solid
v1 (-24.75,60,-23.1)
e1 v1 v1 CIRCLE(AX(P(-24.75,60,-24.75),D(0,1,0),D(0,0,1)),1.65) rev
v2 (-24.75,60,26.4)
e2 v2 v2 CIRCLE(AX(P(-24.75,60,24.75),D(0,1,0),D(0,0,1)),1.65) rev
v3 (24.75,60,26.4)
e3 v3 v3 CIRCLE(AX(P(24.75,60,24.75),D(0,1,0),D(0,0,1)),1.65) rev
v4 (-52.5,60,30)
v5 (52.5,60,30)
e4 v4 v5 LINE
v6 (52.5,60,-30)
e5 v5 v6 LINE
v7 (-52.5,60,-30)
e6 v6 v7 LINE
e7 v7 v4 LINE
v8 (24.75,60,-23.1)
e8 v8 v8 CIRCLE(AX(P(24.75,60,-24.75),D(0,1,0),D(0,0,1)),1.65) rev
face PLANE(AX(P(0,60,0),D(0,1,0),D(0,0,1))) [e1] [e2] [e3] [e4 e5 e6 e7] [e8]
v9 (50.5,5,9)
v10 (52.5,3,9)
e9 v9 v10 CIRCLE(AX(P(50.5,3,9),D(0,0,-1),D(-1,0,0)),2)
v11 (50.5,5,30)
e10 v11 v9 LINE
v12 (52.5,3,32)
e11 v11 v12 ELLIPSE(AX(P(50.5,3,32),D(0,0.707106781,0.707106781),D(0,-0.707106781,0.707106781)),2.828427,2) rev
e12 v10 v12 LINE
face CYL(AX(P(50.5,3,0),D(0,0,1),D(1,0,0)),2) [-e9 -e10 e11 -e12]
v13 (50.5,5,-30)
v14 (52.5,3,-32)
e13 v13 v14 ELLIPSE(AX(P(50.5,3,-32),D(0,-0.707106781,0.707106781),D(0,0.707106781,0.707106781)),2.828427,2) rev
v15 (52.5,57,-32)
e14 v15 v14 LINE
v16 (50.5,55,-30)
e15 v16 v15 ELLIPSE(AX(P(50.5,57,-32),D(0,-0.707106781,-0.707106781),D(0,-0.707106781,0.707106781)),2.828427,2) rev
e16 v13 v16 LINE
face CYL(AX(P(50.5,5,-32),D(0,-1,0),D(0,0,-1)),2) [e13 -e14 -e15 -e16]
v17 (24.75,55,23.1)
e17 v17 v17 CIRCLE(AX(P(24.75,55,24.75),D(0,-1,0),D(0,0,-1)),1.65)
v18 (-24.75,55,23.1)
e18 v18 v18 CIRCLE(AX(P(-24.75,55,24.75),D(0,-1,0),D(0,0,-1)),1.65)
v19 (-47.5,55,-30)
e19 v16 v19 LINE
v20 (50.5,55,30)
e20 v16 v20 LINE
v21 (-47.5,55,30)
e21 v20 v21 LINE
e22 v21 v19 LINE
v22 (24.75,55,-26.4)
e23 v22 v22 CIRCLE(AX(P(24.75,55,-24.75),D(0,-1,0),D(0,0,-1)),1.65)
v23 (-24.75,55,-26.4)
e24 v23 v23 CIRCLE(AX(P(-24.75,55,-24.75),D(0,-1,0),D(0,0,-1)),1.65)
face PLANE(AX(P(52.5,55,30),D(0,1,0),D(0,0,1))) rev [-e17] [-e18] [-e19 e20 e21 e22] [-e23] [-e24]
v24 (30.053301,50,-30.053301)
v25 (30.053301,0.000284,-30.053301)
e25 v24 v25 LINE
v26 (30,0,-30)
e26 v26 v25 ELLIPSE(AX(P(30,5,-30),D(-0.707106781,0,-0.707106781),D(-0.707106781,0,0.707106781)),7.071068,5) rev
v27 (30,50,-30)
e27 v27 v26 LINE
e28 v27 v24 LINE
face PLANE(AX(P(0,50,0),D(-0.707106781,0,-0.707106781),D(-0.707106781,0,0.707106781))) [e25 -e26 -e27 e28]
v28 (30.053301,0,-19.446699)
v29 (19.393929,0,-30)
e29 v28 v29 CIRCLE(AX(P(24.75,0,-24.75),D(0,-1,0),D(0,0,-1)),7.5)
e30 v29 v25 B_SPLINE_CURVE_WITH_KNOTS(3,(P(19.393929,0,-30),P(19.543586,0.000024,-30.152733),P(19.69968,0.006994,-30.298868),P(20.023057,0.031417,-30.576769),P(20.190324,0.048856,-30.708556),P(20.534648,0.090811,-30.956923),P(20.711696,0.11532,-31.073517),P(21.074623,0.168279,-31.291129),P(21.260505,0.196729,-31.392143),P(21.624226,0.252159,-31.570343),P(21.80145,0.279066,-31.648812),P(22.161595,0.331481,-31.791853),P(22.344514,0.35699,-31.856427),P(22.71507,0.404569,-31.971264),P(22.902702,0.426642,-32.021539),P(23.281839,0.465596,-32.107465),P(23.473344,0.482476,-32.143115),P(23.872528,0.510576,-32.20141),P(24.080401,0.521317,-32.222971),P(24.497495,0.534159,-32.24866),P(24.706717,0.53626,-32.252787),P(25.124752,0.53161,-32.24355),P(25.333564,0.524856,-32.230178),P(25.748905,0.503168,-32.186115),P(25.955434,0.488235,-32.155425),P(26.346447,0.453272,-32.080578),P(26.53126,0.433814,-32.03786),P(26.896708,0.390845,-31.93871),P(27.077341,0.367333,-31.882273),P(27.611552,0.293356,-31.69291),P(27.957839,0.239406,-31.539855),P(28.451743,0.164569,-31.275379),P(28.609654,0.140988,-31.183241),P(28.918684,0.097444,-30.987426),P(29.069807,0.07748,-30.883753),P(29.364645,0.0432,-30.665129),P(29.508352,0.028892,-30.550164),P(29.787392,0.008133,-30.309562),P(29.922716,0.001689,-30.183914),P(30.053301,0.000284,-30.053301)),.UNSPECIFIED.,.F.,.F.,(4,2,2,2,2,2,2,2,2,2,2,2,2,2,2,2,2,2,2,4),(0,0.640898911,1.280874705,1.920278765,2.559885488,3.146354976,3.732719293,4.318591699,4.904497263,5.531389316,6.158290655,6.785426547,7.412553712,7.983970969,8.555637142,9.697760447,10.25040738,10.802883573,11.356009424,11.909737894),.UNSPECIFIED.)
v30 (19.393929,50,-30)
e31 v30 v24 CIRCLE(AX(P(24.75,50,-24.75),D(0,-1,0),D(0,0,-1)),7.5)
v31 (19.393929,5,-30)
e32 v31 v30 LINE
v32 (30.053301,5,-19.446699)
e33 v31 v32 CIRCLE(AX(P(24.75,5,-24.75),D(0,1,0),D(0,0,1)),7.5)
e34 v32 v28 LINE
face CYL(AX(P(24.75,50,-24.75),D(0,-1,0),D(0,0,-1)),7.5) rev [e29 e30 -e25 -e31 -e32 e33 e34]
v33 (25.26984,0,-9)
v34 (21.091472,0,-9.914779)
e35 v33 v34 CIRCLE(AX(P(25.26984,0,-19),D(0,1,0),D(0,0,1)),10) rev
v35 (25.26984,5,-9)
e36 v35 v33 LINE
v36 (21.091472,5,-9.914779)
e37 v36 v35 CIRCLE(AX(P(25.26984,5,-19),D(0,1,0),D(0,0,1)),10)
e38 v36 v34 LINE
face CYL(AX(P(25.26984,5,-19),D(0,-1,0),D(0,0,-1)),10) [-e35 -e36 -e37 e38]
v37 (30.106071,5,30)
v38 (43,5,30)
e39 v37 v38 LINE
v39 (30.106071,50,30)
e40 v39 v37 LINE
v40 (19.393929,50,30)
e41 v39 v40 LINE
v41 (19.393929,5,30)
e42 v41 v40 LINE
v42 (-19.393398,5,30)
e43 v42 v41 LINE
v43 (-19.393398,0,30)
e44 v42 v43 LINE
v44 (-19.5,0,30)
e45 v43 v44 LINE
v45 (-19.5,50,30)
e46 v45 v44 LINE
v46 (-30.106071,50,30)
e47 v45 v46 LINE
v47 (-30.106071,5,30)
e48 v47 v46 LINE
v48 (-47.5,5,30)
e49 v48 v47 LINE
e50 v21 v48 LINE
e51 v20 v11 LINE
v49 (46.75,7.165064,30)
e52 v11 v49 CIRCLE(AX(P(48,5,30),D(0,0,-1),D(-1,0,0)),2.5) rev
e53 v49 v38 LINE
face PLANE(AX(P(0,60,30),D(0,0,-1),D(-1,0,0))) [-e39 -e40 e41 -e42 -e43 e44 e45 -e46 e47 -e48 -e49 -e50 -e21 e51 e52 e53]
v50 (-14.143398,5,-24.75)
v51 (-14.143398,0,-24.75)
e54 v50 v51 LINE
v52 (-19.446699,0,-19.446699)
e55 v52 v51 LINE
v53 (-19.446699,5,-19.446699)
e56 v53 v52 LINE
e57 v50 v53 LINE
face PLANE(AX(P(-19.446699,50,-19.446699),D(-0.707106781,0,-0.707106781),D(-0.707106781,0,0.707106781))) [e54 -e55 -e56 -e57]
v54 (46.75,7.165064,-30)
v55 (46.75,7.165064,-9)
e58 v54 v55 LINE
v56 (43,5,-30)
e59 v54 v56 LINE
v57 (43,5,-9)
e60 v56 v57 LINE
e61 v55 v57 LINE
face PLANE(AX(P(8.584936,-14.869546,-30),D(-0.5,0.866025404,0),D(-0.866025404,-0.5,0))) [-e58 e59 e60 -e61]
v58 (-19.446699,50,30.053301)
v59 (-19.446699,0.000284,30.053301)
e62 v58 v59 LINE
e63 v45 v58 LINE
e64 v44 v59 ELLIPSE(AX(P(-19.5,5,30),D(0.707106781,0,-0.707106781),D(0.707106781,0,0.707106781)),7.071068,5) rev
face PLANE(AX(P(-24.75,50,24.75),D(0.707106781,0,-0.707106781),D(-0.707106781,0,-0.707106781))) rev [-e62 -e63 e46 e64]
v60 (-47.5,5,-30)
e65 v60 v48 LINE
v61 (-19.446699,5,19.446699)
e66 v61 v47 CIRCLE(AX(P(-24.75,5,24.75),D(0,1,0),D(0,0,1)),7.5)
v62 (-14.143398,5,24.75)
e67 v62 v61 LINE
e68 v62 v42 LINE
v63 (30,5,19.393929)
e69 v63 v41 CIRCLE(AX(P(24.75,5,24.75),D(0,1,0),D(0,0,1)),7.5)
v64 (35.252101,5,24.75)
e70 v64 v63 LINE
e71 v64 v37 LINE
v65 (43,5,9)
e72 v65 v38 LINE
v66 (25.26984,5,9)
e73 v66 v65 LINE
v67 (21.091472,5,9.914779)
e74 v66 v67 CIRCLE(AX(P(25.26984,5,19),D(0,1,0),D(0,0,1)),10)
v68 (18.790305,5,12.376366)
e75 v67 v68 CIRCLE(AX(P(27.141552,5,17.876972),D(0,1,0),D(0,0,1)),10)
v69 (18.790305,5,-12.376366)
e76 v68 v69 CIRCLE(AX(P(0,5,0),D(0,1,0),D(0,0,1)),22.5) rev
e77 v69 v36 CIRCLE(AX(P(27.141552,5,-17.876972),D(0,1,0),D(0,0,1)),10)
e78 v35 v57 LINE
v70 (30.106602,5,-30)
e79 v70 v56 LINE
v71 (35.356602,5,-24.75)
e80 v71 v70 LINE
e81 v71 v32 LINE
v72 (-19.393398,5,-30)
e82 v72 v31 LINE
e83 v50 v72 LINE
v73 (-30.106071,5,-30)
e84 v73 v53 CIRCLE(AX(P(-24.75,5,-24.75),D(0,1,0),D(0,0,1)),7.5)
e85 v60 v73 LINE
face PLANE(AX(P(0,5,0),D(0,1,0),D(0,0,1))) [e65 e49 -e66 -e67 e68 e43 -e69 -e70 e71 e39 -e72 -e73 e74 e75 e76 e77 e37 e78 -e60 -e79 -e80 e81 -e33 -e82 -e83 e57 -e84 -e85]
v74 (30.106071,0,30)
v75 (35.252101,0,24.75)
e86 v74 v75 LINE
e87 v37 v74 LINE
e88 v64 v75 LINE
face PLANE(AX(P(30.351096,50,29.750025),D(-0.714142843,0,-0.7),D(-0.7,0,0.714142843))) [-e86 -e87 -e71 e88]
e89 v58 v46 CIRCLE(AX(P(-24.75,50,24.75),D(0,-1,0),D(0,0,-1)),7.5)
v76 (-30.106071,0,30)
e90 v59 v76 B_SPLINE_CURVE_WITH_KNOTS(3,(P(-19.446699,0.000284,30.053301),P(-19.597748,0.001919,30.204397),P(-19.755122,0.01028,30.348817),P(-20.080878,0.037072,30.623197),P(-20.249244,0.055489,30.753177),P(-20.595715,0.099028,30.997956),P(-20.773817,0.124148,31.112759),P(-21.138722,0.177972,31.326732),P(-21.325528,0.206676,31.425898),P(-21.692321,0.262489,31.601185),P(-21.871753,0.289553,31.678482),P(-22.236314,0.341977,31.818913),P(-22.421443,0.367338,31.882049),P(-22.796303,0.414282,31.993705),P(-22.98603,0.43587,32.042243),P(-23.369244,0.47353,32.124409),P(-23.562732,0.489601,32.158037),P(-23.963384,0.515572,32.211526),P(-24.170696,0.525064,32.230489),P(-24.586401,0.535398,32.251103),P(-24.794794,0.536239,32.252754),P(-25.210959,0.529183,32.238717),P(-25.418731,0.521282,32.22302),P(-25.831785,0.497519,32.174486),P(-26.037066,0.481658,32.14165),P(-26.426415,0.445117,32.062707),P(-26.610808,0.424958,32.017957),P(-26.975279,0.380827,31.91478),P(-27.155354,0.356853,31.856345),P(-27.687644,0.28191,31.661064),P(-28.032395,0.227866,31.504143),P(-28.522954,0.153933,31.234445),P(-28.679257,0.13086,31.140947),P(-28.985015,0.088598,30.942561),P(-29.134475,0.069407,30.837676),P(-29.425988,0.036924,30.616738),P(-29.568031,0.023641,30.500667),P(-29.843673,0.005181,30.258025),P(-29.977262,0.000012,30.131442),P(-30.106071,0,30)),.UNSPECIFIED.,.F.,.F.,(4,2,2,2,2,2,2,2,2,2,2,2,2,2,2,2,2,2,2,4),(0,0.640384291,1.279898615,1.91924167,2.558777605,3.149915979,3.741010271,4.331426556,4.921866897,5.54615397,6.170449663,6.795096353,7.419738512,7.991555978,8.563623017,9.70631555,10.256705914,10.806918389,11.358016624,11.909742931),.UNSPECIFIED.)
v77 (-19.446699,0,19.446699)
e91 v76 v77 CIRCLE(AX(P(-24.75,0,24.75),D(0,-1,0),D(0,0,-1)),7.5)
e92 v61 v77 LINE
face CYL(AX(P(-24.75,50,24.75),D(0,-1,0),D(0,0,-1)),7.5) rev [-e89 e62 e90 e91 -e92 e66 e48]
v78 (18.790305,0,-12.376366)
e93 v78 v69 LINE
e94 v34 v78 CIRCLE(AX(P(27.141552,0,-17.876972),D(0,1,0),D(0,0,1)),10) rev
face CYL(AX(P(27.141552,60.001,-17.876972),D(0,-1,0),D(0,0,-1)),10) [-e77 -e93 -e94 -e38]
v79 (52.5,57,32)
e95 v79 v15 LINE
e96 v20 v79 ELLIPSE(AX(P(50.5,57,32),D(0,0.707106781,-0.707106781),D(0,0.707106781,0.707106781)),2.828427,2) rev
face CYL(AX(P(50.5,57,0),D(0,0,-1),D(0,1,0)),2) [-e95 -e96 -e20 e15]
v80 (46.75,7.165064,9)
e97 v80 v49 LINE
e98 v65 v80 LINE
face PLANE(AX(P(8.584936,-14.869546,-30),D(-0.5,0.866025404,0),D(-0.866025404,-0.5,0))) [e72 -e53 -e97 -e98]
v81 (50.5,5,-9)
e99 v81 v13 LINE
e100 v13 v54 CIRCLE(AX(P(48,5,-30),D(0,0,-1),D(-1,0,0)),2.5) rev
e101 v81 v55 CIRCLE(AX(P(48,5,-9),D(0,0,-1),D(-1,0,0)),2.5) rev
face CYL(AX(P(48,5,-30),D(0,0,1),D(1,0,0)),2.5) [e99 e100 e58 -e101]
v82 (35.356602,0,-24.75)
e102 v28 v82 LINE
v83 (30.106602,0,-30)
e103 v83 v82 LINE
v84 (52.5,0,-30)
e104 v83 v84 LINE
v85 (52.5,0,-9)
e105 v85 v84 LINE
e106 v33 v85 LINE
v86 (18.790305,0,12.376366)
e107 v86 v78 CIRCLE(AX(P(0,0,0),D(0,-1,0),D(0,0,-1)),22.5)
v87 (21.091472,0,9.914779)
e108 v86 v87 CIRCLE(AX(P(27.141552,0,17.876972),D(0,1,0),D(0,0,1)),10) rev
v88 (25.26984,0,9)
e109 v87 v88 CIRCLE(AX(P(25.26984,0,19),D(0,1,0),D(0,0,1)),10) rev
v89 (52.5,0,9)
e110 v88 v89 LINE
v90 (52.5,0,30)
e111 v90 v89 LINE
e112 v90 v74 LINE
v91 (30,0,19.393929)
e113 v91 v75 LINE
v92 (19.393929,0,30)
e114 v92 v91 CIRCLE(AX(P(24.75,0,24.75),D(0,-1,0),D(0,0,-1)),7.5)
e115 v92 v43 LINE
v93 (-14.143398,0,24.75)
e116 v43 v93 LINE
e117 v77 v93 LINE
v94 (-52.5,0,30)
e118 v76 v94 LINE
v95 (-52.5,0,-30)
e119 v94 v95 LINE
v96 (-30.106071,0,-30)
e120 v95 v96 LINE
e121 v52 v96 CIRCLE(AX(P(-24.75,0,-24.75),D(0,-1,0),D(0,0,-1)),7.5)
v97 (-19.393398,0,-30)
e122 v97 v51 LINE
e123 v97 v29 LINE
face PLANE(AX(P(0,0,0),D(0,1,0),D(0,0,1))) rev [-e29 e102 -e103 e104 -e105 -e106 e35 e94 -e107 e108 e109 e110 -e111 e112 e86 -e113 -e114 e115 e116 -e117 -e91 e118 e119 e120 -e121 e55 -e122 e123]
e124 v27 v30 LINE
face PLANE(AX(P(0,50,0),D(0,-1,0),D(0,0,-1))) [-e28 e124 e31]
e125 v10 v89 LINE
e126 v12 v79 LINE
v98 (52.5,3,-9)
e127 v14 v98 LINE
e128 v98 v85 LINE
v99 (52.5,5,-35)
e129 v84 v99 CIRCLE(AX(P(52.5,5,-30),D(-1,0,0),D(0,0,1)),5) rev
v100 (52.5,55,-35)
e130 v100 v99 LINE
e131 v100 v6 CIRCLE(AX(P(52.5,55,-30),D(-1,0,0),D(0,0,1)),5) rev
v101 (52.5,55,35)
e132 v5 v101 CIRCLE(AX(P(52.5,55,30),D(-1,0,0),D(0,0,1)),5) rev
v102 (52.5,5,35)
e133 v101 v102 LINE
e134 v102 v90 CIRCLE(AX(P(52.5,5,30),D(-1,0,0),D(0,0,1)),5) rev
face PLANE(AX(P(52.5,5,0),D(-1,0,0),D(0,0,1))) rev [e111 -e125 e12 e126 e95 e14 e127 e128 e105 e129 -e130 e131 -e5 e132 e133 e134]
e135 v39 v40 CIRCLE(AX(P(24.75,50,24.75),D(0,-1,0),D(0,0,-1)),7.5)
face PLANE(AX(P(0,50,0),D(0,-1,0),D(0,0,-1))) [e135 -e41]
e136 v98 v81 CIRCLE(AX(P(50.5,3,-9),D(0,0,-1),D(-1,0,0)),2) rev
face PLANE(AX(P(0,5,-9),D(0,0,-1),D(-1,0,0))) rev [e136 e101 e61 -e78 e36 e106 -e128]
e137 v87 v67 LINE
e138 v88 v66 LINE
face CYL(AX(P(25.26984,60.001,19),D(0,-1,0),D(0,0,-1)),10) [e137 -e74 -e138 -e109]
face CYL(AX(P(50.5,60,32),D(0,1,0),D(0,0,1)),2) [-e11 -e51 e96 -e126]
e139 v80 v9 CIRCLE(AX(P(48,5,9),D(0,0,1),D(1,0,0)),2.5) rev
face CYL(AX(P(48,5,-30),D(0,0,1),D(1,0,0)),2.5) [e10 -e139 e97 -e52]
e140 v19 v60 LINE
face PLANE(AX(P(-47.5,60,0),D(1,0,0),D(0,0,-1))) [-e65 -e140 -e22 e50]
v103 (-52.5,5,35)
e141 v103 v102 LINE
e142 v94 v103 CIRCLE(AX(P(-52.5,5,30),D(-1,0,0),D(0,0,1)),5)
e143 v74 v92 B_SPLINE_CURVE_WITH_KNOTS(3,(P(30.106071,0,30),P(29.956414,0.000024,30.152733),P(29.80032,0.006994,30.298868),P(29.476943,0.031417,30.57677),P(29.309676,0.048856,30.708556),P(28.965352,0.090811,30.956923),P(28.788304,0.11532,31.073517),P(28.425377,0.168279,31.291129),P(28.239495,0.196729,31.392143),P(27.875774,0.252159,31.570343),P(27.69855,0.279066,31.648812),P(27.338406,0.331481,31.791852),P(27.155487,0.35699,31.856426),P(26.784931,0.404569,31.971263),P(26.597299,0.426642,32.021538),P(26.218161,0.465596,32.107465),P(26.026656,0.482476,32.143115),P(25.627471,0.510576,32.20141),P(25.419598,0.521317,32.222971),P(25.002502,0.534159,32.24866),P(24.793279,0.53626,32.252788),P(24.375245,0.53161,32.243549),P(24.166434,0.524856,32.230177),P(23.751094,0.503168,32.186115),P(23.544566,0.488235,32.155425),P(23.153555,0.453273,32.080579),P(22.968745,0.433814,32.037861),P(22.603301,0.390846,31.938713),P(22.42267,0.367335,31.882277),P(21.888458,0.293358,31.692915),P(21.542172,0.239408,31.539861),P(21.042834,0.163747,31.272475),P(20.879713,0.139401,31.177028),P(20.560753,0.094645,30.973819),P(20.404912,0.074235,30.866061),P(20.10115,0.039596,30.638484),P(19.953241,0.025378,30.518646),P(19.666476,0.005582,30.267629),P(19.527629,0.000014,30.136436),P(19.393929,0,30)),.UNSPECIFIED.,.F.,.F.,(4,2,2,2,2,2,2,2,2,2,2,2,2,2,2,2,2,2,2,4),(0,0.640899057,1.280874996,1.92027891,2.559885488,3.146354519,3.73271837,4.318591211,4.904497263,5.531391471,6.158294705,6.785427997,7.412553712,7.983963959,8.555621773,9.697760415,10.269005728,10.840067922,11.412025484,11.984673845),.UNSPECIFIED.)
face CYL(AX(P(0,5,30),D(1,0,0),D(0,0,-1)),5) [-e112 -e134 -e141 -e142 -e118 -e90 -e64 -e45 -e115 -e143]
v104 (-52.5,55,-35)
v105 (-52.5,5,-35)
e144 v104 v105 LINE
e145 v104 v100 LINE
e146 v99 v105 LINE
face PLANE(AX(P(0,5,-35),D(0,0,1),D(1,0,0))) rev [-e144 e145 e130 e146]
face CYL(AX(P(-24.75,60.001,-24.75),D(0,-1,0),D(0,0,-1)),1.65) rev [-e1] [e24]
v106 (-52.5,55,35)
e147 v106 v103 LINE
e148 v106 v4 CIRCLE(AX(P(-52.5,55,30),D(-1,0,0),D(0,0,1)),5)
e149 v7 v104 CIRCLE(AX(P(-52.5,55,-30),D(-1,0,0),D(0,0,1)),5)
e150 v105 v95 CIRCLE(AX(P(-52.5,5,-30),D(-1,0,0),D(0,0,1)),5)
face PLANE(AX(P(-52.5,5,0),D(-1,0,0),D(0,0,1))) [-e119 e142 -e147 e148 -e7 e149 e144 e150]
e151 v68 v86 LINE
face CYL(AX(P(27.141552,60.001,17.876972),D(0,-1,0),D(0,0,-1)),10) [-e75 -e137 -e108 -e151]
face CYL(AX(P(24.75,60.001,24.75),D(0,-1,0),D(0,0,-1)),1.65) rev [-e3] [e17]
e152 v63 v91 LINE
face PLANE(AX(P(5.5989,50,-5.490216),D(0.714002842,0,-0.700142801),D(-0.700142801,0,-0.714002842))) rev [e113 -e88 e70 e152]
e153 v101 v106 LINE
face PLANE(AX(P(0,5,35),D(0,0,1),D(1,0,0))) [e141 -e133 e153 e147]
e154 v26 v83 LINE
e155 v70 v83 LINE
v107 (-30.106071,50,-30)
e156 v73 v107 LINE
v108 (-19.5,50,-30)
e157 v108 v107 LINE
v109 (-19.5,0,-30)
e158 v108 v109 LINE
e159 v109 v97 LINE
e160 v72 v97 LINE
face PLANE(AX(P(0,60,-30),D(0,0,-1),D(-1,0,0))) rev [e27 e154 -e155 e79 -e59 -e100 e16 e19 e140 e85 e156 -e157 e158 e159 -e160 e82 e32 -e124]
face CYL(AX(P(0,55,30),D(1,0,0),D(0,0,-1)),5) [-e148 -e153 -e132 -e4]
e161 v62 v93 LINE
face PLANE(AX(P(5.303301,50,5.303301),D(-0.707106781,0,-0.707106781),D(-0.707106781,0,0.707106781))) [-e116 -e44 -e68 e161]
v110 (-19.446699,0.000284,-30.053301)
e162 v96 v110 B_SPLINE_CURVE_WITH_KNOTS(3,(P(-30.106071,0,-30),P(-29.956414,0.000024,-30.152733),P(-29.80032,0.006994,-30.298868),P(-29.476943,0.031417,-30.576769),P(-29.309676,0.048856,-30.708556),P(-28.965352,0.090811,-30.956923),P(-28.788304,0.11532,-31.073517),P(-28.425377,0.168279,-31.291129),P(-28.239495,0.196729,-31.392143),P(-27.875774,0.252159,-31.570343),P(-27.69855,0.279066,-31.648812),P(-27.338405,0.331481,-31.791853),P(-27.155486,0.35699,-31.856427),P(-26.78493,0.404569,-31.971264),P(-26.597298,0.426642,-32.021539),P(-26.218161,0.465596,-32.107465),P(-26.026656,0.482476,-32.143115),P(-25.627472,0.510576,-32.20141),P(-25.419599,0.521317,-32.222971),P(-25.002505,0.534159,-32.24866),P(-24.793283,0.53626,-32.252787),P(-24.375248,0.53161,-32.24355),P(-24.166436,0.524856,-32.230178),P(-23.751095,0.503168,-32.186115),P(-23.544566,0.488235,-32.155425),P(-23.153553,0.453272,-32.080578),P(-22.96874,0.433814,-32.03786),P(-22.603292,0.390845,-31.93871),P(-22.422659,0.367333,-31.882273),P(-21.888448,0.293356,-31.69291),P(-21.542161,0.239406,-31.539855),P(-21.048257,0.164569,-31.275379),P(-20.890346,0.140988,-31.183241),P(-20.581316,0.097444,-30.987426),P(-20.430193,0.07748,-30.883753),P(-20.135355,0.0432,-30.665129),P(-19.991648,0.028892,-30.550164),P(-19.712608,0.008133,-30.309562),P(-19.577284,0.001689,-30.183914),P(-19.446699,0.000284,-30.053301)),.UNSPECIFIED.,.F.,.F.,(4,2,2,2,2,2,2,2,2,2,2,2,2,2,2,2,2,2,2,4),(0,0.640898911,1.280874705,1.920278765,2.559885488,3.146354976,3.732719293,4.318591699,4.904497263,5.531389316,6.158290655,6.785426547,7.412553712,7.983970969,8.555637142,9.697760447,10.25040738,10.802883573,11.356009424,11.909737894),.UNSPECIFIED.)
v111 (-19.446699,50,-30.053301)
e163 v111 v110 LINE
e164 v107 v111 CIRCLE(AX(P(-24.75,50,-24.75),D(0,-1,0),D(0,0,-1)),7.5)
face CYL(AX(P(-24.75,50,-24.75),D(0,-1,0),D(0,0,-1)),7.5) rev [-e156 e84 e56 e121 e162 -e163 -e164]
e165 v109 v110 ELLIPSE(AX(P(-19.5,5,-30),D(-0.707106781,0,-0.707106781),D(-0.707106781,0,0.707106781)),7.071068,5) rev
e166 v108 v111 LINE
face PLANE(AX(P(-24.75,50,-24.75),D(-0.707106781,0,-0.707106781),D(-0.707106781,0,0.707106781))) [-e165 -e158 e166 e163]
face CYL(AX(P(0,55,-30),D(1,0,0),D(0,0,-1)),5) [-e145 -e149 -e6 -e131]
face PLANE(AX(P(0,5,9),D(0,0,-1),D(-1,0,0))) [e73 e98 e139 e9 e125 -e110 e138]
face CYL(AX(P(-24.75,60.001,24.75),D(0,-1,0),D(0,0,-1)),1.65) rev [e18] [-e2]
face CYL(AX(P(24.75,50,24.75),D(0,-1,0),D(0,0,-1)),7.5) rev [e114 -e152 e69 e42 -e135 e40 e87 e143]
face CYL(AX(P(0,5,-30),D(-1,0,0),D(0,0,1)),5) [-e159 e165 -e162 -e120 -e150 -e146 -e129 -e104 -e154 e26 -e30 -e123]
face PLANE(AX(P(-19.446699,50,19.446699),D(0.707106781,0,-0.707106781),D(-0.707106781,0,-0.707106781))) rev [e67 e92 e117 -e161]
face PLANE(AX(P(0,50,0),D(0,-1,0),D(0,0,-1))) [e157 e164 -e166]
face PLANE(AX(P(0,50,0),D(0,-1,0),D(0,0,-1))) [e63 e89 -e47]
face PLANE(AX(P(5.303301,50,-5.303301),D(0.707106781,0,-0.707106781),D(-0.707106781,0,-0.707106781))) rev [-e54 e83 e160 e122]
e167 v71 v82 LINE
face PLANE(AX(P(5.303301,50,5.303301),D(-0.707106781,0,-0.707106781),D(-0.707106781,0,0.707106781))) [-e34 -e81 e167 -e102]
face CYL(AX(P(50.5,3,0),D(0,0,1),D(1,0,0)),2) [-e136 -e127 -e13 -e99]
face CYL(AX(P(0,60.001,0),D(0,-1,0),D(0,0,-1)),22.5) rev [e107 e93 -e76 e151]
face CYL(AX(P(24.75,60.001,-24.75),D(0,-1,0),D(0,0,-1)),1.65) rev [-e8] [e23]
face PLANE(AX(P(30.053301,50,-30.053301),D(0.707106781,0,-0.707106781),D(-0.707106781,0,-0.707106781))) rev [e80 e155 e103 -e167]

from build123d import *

# Parameters (mm, degrees)
EXTRUDE_1_DEPTH     = 5
SKETCH_3_W          = 100
SKETCH_3_H          = 5
SKETCH_3_W_2        = 5
SKETCH_3_H_2        = 60
EXTRUDE_2_DEPTH     = 55
SKETCH_4_W          = 60
SKETCH_4_H          = 5
EXTRUDE_3_DEPTH     = 100
CUT_EXTRUDE_1_REACH = 89.07
FILLET_2_R          = 10
FILLET_3_R          = 10
FILLET_4_R          = 5
FILLET_5_R          = 2
CUT_EXTRUDE_2_REACH = 85.703
SKETCH_6_R          = 1.65
CUT_EXTRUDE_START   = -50
CUT_EXTRUDE_3_DEPTH = 50
EXTRUDE_4_DEPTH     = 60
SKETCH_10_W         = 7.5
SKETCH_10_H         = 18
CUT_EXTRUDE_4_DEPTH = 5


# Read off the part's stored shape, not the designer's step: 切除-拉伸3
with BuildPart() as part:
    # 草图1 → 凸台-拉伸1 (new body)
    with BuildSketch(Plane(origin=(0, 0, 0), x_dir=(1, 0, 0), z_dir=(0, 1, 0))):
        Polygon((-52.5, 35), (-52.5, -35), (52.5, -35), (52.5, -9), (-20, -9), (-20, 9), (52.5, 9), (52.5, 35), align=None)
    extrude(amount=EXTRUDE_1_DEPTH)

    # 草图3 → 凸台-拉伸2 (add)
    with BuildSketch(Plane(origin=(0, 5, 0), x_dir=(1, 0, 0), z_dir=(0, 1, 0))):
        with Locations((2.5, 32.5)):
            Rectangle(SKETCH_3_W, SKETCH_3_H)
        with Locations((-50, 32.5)):
            Rectangle(SKETCH_3_W_2, SKETCH_3_H)
        with Locations((-50, 0)):
            Rectangle(SKETCH_3_W_2, SKETCH_3_H_2)
        with Locations((2.5, -32.5)):
            Rectangle(SKETCH_3_W, SKETCH_3_H)
        with Locations((-50, -32.5)):
            Rectangle(SKETCH_3_W_2, SKETCH_3_H)
    extrude(amount=EXTRUDE_2_DEPTH)

    # 草图4 → 凸台-拉伸3 (add)
    with BuildSketch(Plane(origin=(-47.5, 0, 0), x_dir=(0, 0, -1), z_dir=(1, 0, 0))):
        with Locations((0, 57.5)):
            Rectangle(SKETCH_4_W, SKETCH_4_H)
    extrude(amount=EXTRUDE_3_DEPTH)

    # 草图5 → 切除-拉伸1 (cut, up to next)
    with BuildSketch(Plane.XZ, mode=Mode.PRIVATE) as cut_extrude_1_sk1:
        with BuildLine():
            Line((19.852941176, 10.588235294), (0, 22.5))
            ThreePointArc((0, 22.5), (-22.5, 0), (0, -22.5))
            Line((0, -22.5), (19.852941176, -10.588235294))
            ThreePointArc((19.852941176, -10.588235294), (20.252840641, -9.801655267), (20.621590627, -9))
            Line((20.621590627, -9), (-20, -9))
            Line((-20, -9), (-20, 9))
            Line((-20, 9), (20.621590627, 9))
            ThreePointArc((20.621590627, 9), (20.252840641, 9.801655267), (19.852941176, 10.588235294))
        make_face()
    cut_extrude_1_tool1 = extrude(cut_extrude_1_sk1.sketch, amount=-CUT_EXTRUDE_1_REACH, mode=Mode.PRIVATE) & part.part
    # 草图5 → 切除-拉伸1 (cut, up to next)
    with BuildSketch(Plane.XZ, mode=Mode.PRIVATE) as cut_extrude_1_sk2:
        with BuildLine():
            Line((22.5, 9), (19.852941176, 10.588235294))
            ThreePointArc((19.852941176, 10.588235294), (20.252840641, 9.801655267), (20.621590627, 9))
            Line((20.621590627, 9), (22.5, 9))
        make_face()
    cut_extrude_1_tool2 = extrude(cut_extrude_1_sk2.sketch, amount=-CUT_EXTRUDE_1_REACH, mode=Mode.PRIVATE) & part.part
    # 草图5 → 切除-拉伸1 (cut, up to next)
    with BuildSketch(Plane.XZ, mode=Mode.PRIVATE) as cut_extrude_1_sk3:
        with BuildLine():
            ThreePointArc((20.621590627, -9), (20.252840641, -9.801655267), (19.852941176, -10.588235294))
            Line((19.852941176, -10.588235294), (22.5, -9))
            Line((22.5, -9), (20.621590627, -9))
        make_face()
    cut_extrude_1_tool3 = extrude(cut_extrude_1_sk3.sketch, amount=-CUT_EXTRUDE_1_REACH, mode=Mode.PRIVATE) & part.part
    # 草图5 → 切除-拉伸1 (cut, up to next)
    with BuildSketch(Plane.XZ, mode=Mode.PRIVATE) as cut_extrude_1_sk4:
        with BuildLine():
            ThreePointArc((19.852941176, 10.588235294), (11.576154497, 19.293590829), (0, 22.5))
            Line((0, 22.5), (19.852941176, 10.588235294))
        make_face()
    cut_extrude_1_tool4 = extrude(cut_extrude_1_sk4.sketch, amount=-CUT_EXTRUDE_1_REACH, mode=Mode.PRIVATE) & part.part
    # 草图5 → 切除-拉伸1 (cut, up to next)
    with BuildSketch(Plane.XZ, mode=Mode.PRIVATE) as cut_extrude_1_sk5:
        with BuildLine():
            Line((19.852941176, -10.588235294), (0, -22.5))
            ThreePointArc((0, -22.5), (11.576154497, -19.293590829), (19.852941176, -10.588235294))
        make_face()
    cut_extrude_1_tool5 = extrude(cut_extrude_1_sk5.sketch, amount=-CUT_EXTRUDE_1_REACH, mode=Mode.PRIVATE) & part.part
    add(cut_extrude_1_tool1.solids().sort_by_distance((19.691832, 0, -9.530147))[0], mode=Mode.SUBTRACT)
    add(cut_extrude_1_tool2.solids().sort_by_distance((21.001859, 0, 9.525708))[0], mode=Mode.SUBTRACT)
    add(cut_extrude_1_tool3.solids().sort_by_distance((21.001859, 0, -9.525708))[0], mode=Mode.SUBTRACT)
    add(cut_extrude_1_tool4.solids().sort_by_distance((10.590548, 0, 17.650913))[0], mode=Mode.SUBTRACT)
    add(cut_extrude_1_tool5.solids().sort_by_distance((10.590548, 0, -17.650913))[0], mode=Mode.SUBTRACT)

    # 圆角2
    # the kernel refuses this fillet: 10 mm, written as the material it takes off along each edge
    with BuildSketch(Plane(origin=(19.852941176, -6.249770084, 10.588235294), x_dir=(-0.5108705169858321, 0, 0.8596576730737815), z_dir=(0, 1, 0))) as fillet_2_piece_1:
        with BuildLine():
            CenterArc((2.542282374, 9.989311313), FILLET_2_R, 241.685588385, 25.665066698)
            Line((-2.200814232, 1.185730531), (0, 0))
            ThreePointArc((0, 0), (1.040024608, 0.024049546), (2.080049215, 0))
        make_face()
    extrude(amount=17.499540168, mode=Mode.SUBTRACT)
    with BuildSketch(Plane(origin=(22.5, -6.924599124, 9), x_dir=(1, 0, 0), z_dir=(0, 1, 0))) as fillet_2_piece_2:
        with BuildLine():
            CenterArc((FILLET_2_R * 0.276983964948, -FILLET_2_R), FILLET_2_R, 90, 30.963756532)
            Line((-FILLET_2_R * 0.237511790479, -FILLET_2_R * 0.142507074287), (0, 0))
            Line((0, 0), (FILLET_2_R * 0.276983964948, 0))
        make_face()
    extrude(amount=18.849198247, mode=Mode.SUBTRACT)

    # 圆角3
    # the kernel refuses this fillet: 10 mm, written as the material it takes off along each edge
    with BuildSketch(Plane(origin=(22.5, -6.924599124, -9), x_dir=(1, 0, 0), z_dir=(0, 1, 0))) as fillet_3_piece_1:
        with BuildLine():
            CenterArc((FILLET_3_R * 0.276983964948, FILLET_3_R), FILLET_3_R, 239.036243468, 30.963756532)
            Line((-FILLET_3_R * 0.237511790479, FILLET_3_R * 0.142507074287), (0, 0))
            Line((0, 0), (FILLET_3_R * 0.276983964948, 0))
        make_face()
    extrude(amount=18.849198247, mode=Mode.SUBTRACT)
    with BuildSketch(Plane(origin=(19.852941176, -6.249770084, -10.588235294), x_dir=(0.857492925712544, 0, 0.5144957554275268), z_dir=(0, 1, 0))) as fillet_3_piece_2:
        with BuildLine():
            CenterArc((2.499908034, 10), FILLET_3_R, 244.334933302, 25.665066698)
            ThreePointArc((-1.83118813, 0.986587437), (-0.904187133, 0.514465931), (0, 0))
            Line((0, 0), (2.499908034, 0))
        make_face()
    extrude(amount=17.499540168, mode=Mode.SUBTRACT)

    # 圆角4
    fillet_4_edges = [part.edges().sort_by_distance(p)[0] for p in [
        (0, 0, 35),
        (0, 0, -35),
        (0, 60, -35),
        (0, 60, 35),
    ]]
    fillet(fillet_4_edges, radius=FILLET_4_R)

    # 圆角5
    fillet_5_edges = [part.edges().sort_by_distance(p)[0] for p in [
        (52.5, 5, 19.5),
        (52.5, 5, -19.5),
        (52.5, 30, -30),
        (52.5, 30, 30),
        (52.5, 55, 0),
    ]]
    fillet(fillet_5_edges, radius=FILLET_5_R)

    # 草图6 → 切除-拉伸2 (cut, up to next)
    with BuildSketch(Plane.XZ.offset(-55), mode=Mode.PRIVATE) as cut_extrude_2_sk1:
        with Locations(Location((-24.75, 24.75, 0), (0, 0, 270))):
            Circle(SKETCH_6_R)
    cut_extrude_2_tool1 = extrude(cut_extrude_2_sk1.sketch, amount=-CUT_EXTRUDE_2_REACH, mode=Mode.PRIVATE) & part.part
    # 草图6 → 切除-拉伸2 (cut, up to next)
    with BuildSketch(Plane.XZ.offset(-55), mode=Mode.PRIVATE) as cut_extrude_2_sk2:
        with Locations(Location((24.75, 24.75, 0), (0, 0, 270))):
            Circle(SKETCH_6_R)
    cut_extrude_2_tool2 = extrude(cut_extrude_2_sk2.sketch, amount=-CUT_EXTRUDE_2_REACH, mode=Mode.PRIVATE) & part.part
    # 草图6 → 切除-拉伸2 (cut, up to next)
    with BuildSketch(Plane.XZ.offset(-55), mode=Mode.PRIVATE) as cut_extrude_2_sk3:
        with Locations(Location((24.75, -24.75, 0), (0, 0, 270))):
            Circle(SKETCH_6_R)
    cut_extrude_2_tool3 = extrude(cut_extrude_2_sk3.sketch, amount=-CUT_EXTRUDE_2_REACH, mode=Mode.PRIVATE) & part.part
    # 草图6 → 切除-拉伸2 (cut, up to next)
    with BuildSketch(Plane.XZ.offset(-55), mode=Mode.PRIVATE) as cut_extrude_2_sk4:
        with Locations(Location((-24.75, -24.75, 0), (0, 0, 270))):
            Circle(SKETCH_6_R)
    cut_extrude_2_tool4 = extrude(cut_extrude_2_sk4.sketch, amount=-CUT_EXTRUDE_2_REACH, mode=Mode.PRIVATE) & part.part
    add(cut_extrude_2_tool1.solids().sort_by_distance((-24.75, 55, 24.75))[0], mode=Mode.SUBTRACT)
    add(cut_extrude_2_tool2.solids().sort_by_distance((24.75, 55, 24.75))[0], mode=Mode.SUBTRACT)
    add(cut_extrude_2_tool3.solids().sort_by_distance((24.75, 55, -24.75))[0], mode=Mode.SUBTRACT)
    add(cut_extrude_2_tool4.solids().sort_by_distance((-24.75, 55, -24.75))[0], mode=Mode.SUBTRACT)

    # 切除-拉伸3 outline → 切除-拉伸3 (cut)
    with BuildSketch(Plane.XZ.offset(CUT_EXTRUDE_START)):
        with BuildLine():
            Line((30, 19.393928679), (35.25210063, 24.75))
            Line((35.25210063, 24.75), (30.106071321, 30))
            ThreePointArc((30.106071321, 30), (17.250375047, 24.82500375), (30, 19.393928679))
        make_face()
        with BuildLine():
            Line((-14.143398282, 24.75), (-19.393398282, 30))
            Line((-19.393398282, 30), (-19.5, 30))
            Line((-19.5, 30), (-19.446699141, 30.053300859))
            ThreePointArc((-19.446699141, 30.053300859), (-32.25, 24.75), (-19.446699141, 19.446699141))
            Line((-19.446699141, 19.446699141), (-14.143398282, 24.75))
        make_face()
        with BuildLine():
            Line((-19.5, -30), (-19.393398282, -30))
            Line((-19.393398282, -30), (-14.143398282, -24.75))
            Line((-14.143398282, -24.75), (-19.446699141, -19.446699141))
            ThreePointArc((-19.446699141, -19.446699141), (-32.25, -24.75), (-19.446699141, -30.053300859))
            Line((-19.446699141, -30.053300859), (-19.5, -30))
        make_face()
        with BuildLine():
            Line((35.356601718, -24.75), (30.053300859, -19.446699141))
            ThreePointArc((30.053300859, -19.446699141), (17.25, -24.75), (30.053300859, -30.053300859))
            Line((30.053300859, -30.053300859), (30, -30))
            Line((30, -30), (30.106601718, -30))
            Line((30.106601718, -30), (35.356601718, -24.75))
        make_face()
    extrude(amount=CUT_EXTRUDE_3_DEPTH, mode=Mode.SUBTRACT)

    # 草图9 → 凸台-拉伸4 (add)
    with BuildSketch(Plane(origin=(0, 0, 30), x_dir=(-1, 0, 0), z_dir=(0, 0, -1))):
        with BuildLine():
            Line((-43, 5), (-46.75, 7.165063509))
            ThreePointArc((-46.75, 7.165063509), (-45.834936491, 6.25), (-45.5, 5))
            Line((-45.5, 5), (-43, 5))
        make_face()
        with BuildLine():
            ThreePointArc((-46.75, 7.165063509), (-49.25, 7.165063509), (-50.5, 5))
            Line((-50.5, 5), (-48, 5))
            Line((-48, 5), (-46.75, 7.165063509))
        make_face()
        with BuildLine():
            Line((-46.75, 7.165063509), (-48, 5))
            Line((-48, 5), (-45.5, 5))
            ThreePointArc((-45.5, 5), (-45.834936491, 6.25), (-46.75, 7.165063509))
        make_face()
    extrude(amount=EXTRUDE_4_DEPTH)

    # 草图10 → 切除-拉伸4 (cut)
    with BuildSketch(Plane.XZ.offset(-5)):
        with Locations((46.75, 0)):
            Rectangle(SKETCH_10_W, SKETCH_10_H)
    extrude(amount=-CUT_EXTRUDE_4_DEPTH, mode=Mode.SUBTRACT)


solid = part.part
